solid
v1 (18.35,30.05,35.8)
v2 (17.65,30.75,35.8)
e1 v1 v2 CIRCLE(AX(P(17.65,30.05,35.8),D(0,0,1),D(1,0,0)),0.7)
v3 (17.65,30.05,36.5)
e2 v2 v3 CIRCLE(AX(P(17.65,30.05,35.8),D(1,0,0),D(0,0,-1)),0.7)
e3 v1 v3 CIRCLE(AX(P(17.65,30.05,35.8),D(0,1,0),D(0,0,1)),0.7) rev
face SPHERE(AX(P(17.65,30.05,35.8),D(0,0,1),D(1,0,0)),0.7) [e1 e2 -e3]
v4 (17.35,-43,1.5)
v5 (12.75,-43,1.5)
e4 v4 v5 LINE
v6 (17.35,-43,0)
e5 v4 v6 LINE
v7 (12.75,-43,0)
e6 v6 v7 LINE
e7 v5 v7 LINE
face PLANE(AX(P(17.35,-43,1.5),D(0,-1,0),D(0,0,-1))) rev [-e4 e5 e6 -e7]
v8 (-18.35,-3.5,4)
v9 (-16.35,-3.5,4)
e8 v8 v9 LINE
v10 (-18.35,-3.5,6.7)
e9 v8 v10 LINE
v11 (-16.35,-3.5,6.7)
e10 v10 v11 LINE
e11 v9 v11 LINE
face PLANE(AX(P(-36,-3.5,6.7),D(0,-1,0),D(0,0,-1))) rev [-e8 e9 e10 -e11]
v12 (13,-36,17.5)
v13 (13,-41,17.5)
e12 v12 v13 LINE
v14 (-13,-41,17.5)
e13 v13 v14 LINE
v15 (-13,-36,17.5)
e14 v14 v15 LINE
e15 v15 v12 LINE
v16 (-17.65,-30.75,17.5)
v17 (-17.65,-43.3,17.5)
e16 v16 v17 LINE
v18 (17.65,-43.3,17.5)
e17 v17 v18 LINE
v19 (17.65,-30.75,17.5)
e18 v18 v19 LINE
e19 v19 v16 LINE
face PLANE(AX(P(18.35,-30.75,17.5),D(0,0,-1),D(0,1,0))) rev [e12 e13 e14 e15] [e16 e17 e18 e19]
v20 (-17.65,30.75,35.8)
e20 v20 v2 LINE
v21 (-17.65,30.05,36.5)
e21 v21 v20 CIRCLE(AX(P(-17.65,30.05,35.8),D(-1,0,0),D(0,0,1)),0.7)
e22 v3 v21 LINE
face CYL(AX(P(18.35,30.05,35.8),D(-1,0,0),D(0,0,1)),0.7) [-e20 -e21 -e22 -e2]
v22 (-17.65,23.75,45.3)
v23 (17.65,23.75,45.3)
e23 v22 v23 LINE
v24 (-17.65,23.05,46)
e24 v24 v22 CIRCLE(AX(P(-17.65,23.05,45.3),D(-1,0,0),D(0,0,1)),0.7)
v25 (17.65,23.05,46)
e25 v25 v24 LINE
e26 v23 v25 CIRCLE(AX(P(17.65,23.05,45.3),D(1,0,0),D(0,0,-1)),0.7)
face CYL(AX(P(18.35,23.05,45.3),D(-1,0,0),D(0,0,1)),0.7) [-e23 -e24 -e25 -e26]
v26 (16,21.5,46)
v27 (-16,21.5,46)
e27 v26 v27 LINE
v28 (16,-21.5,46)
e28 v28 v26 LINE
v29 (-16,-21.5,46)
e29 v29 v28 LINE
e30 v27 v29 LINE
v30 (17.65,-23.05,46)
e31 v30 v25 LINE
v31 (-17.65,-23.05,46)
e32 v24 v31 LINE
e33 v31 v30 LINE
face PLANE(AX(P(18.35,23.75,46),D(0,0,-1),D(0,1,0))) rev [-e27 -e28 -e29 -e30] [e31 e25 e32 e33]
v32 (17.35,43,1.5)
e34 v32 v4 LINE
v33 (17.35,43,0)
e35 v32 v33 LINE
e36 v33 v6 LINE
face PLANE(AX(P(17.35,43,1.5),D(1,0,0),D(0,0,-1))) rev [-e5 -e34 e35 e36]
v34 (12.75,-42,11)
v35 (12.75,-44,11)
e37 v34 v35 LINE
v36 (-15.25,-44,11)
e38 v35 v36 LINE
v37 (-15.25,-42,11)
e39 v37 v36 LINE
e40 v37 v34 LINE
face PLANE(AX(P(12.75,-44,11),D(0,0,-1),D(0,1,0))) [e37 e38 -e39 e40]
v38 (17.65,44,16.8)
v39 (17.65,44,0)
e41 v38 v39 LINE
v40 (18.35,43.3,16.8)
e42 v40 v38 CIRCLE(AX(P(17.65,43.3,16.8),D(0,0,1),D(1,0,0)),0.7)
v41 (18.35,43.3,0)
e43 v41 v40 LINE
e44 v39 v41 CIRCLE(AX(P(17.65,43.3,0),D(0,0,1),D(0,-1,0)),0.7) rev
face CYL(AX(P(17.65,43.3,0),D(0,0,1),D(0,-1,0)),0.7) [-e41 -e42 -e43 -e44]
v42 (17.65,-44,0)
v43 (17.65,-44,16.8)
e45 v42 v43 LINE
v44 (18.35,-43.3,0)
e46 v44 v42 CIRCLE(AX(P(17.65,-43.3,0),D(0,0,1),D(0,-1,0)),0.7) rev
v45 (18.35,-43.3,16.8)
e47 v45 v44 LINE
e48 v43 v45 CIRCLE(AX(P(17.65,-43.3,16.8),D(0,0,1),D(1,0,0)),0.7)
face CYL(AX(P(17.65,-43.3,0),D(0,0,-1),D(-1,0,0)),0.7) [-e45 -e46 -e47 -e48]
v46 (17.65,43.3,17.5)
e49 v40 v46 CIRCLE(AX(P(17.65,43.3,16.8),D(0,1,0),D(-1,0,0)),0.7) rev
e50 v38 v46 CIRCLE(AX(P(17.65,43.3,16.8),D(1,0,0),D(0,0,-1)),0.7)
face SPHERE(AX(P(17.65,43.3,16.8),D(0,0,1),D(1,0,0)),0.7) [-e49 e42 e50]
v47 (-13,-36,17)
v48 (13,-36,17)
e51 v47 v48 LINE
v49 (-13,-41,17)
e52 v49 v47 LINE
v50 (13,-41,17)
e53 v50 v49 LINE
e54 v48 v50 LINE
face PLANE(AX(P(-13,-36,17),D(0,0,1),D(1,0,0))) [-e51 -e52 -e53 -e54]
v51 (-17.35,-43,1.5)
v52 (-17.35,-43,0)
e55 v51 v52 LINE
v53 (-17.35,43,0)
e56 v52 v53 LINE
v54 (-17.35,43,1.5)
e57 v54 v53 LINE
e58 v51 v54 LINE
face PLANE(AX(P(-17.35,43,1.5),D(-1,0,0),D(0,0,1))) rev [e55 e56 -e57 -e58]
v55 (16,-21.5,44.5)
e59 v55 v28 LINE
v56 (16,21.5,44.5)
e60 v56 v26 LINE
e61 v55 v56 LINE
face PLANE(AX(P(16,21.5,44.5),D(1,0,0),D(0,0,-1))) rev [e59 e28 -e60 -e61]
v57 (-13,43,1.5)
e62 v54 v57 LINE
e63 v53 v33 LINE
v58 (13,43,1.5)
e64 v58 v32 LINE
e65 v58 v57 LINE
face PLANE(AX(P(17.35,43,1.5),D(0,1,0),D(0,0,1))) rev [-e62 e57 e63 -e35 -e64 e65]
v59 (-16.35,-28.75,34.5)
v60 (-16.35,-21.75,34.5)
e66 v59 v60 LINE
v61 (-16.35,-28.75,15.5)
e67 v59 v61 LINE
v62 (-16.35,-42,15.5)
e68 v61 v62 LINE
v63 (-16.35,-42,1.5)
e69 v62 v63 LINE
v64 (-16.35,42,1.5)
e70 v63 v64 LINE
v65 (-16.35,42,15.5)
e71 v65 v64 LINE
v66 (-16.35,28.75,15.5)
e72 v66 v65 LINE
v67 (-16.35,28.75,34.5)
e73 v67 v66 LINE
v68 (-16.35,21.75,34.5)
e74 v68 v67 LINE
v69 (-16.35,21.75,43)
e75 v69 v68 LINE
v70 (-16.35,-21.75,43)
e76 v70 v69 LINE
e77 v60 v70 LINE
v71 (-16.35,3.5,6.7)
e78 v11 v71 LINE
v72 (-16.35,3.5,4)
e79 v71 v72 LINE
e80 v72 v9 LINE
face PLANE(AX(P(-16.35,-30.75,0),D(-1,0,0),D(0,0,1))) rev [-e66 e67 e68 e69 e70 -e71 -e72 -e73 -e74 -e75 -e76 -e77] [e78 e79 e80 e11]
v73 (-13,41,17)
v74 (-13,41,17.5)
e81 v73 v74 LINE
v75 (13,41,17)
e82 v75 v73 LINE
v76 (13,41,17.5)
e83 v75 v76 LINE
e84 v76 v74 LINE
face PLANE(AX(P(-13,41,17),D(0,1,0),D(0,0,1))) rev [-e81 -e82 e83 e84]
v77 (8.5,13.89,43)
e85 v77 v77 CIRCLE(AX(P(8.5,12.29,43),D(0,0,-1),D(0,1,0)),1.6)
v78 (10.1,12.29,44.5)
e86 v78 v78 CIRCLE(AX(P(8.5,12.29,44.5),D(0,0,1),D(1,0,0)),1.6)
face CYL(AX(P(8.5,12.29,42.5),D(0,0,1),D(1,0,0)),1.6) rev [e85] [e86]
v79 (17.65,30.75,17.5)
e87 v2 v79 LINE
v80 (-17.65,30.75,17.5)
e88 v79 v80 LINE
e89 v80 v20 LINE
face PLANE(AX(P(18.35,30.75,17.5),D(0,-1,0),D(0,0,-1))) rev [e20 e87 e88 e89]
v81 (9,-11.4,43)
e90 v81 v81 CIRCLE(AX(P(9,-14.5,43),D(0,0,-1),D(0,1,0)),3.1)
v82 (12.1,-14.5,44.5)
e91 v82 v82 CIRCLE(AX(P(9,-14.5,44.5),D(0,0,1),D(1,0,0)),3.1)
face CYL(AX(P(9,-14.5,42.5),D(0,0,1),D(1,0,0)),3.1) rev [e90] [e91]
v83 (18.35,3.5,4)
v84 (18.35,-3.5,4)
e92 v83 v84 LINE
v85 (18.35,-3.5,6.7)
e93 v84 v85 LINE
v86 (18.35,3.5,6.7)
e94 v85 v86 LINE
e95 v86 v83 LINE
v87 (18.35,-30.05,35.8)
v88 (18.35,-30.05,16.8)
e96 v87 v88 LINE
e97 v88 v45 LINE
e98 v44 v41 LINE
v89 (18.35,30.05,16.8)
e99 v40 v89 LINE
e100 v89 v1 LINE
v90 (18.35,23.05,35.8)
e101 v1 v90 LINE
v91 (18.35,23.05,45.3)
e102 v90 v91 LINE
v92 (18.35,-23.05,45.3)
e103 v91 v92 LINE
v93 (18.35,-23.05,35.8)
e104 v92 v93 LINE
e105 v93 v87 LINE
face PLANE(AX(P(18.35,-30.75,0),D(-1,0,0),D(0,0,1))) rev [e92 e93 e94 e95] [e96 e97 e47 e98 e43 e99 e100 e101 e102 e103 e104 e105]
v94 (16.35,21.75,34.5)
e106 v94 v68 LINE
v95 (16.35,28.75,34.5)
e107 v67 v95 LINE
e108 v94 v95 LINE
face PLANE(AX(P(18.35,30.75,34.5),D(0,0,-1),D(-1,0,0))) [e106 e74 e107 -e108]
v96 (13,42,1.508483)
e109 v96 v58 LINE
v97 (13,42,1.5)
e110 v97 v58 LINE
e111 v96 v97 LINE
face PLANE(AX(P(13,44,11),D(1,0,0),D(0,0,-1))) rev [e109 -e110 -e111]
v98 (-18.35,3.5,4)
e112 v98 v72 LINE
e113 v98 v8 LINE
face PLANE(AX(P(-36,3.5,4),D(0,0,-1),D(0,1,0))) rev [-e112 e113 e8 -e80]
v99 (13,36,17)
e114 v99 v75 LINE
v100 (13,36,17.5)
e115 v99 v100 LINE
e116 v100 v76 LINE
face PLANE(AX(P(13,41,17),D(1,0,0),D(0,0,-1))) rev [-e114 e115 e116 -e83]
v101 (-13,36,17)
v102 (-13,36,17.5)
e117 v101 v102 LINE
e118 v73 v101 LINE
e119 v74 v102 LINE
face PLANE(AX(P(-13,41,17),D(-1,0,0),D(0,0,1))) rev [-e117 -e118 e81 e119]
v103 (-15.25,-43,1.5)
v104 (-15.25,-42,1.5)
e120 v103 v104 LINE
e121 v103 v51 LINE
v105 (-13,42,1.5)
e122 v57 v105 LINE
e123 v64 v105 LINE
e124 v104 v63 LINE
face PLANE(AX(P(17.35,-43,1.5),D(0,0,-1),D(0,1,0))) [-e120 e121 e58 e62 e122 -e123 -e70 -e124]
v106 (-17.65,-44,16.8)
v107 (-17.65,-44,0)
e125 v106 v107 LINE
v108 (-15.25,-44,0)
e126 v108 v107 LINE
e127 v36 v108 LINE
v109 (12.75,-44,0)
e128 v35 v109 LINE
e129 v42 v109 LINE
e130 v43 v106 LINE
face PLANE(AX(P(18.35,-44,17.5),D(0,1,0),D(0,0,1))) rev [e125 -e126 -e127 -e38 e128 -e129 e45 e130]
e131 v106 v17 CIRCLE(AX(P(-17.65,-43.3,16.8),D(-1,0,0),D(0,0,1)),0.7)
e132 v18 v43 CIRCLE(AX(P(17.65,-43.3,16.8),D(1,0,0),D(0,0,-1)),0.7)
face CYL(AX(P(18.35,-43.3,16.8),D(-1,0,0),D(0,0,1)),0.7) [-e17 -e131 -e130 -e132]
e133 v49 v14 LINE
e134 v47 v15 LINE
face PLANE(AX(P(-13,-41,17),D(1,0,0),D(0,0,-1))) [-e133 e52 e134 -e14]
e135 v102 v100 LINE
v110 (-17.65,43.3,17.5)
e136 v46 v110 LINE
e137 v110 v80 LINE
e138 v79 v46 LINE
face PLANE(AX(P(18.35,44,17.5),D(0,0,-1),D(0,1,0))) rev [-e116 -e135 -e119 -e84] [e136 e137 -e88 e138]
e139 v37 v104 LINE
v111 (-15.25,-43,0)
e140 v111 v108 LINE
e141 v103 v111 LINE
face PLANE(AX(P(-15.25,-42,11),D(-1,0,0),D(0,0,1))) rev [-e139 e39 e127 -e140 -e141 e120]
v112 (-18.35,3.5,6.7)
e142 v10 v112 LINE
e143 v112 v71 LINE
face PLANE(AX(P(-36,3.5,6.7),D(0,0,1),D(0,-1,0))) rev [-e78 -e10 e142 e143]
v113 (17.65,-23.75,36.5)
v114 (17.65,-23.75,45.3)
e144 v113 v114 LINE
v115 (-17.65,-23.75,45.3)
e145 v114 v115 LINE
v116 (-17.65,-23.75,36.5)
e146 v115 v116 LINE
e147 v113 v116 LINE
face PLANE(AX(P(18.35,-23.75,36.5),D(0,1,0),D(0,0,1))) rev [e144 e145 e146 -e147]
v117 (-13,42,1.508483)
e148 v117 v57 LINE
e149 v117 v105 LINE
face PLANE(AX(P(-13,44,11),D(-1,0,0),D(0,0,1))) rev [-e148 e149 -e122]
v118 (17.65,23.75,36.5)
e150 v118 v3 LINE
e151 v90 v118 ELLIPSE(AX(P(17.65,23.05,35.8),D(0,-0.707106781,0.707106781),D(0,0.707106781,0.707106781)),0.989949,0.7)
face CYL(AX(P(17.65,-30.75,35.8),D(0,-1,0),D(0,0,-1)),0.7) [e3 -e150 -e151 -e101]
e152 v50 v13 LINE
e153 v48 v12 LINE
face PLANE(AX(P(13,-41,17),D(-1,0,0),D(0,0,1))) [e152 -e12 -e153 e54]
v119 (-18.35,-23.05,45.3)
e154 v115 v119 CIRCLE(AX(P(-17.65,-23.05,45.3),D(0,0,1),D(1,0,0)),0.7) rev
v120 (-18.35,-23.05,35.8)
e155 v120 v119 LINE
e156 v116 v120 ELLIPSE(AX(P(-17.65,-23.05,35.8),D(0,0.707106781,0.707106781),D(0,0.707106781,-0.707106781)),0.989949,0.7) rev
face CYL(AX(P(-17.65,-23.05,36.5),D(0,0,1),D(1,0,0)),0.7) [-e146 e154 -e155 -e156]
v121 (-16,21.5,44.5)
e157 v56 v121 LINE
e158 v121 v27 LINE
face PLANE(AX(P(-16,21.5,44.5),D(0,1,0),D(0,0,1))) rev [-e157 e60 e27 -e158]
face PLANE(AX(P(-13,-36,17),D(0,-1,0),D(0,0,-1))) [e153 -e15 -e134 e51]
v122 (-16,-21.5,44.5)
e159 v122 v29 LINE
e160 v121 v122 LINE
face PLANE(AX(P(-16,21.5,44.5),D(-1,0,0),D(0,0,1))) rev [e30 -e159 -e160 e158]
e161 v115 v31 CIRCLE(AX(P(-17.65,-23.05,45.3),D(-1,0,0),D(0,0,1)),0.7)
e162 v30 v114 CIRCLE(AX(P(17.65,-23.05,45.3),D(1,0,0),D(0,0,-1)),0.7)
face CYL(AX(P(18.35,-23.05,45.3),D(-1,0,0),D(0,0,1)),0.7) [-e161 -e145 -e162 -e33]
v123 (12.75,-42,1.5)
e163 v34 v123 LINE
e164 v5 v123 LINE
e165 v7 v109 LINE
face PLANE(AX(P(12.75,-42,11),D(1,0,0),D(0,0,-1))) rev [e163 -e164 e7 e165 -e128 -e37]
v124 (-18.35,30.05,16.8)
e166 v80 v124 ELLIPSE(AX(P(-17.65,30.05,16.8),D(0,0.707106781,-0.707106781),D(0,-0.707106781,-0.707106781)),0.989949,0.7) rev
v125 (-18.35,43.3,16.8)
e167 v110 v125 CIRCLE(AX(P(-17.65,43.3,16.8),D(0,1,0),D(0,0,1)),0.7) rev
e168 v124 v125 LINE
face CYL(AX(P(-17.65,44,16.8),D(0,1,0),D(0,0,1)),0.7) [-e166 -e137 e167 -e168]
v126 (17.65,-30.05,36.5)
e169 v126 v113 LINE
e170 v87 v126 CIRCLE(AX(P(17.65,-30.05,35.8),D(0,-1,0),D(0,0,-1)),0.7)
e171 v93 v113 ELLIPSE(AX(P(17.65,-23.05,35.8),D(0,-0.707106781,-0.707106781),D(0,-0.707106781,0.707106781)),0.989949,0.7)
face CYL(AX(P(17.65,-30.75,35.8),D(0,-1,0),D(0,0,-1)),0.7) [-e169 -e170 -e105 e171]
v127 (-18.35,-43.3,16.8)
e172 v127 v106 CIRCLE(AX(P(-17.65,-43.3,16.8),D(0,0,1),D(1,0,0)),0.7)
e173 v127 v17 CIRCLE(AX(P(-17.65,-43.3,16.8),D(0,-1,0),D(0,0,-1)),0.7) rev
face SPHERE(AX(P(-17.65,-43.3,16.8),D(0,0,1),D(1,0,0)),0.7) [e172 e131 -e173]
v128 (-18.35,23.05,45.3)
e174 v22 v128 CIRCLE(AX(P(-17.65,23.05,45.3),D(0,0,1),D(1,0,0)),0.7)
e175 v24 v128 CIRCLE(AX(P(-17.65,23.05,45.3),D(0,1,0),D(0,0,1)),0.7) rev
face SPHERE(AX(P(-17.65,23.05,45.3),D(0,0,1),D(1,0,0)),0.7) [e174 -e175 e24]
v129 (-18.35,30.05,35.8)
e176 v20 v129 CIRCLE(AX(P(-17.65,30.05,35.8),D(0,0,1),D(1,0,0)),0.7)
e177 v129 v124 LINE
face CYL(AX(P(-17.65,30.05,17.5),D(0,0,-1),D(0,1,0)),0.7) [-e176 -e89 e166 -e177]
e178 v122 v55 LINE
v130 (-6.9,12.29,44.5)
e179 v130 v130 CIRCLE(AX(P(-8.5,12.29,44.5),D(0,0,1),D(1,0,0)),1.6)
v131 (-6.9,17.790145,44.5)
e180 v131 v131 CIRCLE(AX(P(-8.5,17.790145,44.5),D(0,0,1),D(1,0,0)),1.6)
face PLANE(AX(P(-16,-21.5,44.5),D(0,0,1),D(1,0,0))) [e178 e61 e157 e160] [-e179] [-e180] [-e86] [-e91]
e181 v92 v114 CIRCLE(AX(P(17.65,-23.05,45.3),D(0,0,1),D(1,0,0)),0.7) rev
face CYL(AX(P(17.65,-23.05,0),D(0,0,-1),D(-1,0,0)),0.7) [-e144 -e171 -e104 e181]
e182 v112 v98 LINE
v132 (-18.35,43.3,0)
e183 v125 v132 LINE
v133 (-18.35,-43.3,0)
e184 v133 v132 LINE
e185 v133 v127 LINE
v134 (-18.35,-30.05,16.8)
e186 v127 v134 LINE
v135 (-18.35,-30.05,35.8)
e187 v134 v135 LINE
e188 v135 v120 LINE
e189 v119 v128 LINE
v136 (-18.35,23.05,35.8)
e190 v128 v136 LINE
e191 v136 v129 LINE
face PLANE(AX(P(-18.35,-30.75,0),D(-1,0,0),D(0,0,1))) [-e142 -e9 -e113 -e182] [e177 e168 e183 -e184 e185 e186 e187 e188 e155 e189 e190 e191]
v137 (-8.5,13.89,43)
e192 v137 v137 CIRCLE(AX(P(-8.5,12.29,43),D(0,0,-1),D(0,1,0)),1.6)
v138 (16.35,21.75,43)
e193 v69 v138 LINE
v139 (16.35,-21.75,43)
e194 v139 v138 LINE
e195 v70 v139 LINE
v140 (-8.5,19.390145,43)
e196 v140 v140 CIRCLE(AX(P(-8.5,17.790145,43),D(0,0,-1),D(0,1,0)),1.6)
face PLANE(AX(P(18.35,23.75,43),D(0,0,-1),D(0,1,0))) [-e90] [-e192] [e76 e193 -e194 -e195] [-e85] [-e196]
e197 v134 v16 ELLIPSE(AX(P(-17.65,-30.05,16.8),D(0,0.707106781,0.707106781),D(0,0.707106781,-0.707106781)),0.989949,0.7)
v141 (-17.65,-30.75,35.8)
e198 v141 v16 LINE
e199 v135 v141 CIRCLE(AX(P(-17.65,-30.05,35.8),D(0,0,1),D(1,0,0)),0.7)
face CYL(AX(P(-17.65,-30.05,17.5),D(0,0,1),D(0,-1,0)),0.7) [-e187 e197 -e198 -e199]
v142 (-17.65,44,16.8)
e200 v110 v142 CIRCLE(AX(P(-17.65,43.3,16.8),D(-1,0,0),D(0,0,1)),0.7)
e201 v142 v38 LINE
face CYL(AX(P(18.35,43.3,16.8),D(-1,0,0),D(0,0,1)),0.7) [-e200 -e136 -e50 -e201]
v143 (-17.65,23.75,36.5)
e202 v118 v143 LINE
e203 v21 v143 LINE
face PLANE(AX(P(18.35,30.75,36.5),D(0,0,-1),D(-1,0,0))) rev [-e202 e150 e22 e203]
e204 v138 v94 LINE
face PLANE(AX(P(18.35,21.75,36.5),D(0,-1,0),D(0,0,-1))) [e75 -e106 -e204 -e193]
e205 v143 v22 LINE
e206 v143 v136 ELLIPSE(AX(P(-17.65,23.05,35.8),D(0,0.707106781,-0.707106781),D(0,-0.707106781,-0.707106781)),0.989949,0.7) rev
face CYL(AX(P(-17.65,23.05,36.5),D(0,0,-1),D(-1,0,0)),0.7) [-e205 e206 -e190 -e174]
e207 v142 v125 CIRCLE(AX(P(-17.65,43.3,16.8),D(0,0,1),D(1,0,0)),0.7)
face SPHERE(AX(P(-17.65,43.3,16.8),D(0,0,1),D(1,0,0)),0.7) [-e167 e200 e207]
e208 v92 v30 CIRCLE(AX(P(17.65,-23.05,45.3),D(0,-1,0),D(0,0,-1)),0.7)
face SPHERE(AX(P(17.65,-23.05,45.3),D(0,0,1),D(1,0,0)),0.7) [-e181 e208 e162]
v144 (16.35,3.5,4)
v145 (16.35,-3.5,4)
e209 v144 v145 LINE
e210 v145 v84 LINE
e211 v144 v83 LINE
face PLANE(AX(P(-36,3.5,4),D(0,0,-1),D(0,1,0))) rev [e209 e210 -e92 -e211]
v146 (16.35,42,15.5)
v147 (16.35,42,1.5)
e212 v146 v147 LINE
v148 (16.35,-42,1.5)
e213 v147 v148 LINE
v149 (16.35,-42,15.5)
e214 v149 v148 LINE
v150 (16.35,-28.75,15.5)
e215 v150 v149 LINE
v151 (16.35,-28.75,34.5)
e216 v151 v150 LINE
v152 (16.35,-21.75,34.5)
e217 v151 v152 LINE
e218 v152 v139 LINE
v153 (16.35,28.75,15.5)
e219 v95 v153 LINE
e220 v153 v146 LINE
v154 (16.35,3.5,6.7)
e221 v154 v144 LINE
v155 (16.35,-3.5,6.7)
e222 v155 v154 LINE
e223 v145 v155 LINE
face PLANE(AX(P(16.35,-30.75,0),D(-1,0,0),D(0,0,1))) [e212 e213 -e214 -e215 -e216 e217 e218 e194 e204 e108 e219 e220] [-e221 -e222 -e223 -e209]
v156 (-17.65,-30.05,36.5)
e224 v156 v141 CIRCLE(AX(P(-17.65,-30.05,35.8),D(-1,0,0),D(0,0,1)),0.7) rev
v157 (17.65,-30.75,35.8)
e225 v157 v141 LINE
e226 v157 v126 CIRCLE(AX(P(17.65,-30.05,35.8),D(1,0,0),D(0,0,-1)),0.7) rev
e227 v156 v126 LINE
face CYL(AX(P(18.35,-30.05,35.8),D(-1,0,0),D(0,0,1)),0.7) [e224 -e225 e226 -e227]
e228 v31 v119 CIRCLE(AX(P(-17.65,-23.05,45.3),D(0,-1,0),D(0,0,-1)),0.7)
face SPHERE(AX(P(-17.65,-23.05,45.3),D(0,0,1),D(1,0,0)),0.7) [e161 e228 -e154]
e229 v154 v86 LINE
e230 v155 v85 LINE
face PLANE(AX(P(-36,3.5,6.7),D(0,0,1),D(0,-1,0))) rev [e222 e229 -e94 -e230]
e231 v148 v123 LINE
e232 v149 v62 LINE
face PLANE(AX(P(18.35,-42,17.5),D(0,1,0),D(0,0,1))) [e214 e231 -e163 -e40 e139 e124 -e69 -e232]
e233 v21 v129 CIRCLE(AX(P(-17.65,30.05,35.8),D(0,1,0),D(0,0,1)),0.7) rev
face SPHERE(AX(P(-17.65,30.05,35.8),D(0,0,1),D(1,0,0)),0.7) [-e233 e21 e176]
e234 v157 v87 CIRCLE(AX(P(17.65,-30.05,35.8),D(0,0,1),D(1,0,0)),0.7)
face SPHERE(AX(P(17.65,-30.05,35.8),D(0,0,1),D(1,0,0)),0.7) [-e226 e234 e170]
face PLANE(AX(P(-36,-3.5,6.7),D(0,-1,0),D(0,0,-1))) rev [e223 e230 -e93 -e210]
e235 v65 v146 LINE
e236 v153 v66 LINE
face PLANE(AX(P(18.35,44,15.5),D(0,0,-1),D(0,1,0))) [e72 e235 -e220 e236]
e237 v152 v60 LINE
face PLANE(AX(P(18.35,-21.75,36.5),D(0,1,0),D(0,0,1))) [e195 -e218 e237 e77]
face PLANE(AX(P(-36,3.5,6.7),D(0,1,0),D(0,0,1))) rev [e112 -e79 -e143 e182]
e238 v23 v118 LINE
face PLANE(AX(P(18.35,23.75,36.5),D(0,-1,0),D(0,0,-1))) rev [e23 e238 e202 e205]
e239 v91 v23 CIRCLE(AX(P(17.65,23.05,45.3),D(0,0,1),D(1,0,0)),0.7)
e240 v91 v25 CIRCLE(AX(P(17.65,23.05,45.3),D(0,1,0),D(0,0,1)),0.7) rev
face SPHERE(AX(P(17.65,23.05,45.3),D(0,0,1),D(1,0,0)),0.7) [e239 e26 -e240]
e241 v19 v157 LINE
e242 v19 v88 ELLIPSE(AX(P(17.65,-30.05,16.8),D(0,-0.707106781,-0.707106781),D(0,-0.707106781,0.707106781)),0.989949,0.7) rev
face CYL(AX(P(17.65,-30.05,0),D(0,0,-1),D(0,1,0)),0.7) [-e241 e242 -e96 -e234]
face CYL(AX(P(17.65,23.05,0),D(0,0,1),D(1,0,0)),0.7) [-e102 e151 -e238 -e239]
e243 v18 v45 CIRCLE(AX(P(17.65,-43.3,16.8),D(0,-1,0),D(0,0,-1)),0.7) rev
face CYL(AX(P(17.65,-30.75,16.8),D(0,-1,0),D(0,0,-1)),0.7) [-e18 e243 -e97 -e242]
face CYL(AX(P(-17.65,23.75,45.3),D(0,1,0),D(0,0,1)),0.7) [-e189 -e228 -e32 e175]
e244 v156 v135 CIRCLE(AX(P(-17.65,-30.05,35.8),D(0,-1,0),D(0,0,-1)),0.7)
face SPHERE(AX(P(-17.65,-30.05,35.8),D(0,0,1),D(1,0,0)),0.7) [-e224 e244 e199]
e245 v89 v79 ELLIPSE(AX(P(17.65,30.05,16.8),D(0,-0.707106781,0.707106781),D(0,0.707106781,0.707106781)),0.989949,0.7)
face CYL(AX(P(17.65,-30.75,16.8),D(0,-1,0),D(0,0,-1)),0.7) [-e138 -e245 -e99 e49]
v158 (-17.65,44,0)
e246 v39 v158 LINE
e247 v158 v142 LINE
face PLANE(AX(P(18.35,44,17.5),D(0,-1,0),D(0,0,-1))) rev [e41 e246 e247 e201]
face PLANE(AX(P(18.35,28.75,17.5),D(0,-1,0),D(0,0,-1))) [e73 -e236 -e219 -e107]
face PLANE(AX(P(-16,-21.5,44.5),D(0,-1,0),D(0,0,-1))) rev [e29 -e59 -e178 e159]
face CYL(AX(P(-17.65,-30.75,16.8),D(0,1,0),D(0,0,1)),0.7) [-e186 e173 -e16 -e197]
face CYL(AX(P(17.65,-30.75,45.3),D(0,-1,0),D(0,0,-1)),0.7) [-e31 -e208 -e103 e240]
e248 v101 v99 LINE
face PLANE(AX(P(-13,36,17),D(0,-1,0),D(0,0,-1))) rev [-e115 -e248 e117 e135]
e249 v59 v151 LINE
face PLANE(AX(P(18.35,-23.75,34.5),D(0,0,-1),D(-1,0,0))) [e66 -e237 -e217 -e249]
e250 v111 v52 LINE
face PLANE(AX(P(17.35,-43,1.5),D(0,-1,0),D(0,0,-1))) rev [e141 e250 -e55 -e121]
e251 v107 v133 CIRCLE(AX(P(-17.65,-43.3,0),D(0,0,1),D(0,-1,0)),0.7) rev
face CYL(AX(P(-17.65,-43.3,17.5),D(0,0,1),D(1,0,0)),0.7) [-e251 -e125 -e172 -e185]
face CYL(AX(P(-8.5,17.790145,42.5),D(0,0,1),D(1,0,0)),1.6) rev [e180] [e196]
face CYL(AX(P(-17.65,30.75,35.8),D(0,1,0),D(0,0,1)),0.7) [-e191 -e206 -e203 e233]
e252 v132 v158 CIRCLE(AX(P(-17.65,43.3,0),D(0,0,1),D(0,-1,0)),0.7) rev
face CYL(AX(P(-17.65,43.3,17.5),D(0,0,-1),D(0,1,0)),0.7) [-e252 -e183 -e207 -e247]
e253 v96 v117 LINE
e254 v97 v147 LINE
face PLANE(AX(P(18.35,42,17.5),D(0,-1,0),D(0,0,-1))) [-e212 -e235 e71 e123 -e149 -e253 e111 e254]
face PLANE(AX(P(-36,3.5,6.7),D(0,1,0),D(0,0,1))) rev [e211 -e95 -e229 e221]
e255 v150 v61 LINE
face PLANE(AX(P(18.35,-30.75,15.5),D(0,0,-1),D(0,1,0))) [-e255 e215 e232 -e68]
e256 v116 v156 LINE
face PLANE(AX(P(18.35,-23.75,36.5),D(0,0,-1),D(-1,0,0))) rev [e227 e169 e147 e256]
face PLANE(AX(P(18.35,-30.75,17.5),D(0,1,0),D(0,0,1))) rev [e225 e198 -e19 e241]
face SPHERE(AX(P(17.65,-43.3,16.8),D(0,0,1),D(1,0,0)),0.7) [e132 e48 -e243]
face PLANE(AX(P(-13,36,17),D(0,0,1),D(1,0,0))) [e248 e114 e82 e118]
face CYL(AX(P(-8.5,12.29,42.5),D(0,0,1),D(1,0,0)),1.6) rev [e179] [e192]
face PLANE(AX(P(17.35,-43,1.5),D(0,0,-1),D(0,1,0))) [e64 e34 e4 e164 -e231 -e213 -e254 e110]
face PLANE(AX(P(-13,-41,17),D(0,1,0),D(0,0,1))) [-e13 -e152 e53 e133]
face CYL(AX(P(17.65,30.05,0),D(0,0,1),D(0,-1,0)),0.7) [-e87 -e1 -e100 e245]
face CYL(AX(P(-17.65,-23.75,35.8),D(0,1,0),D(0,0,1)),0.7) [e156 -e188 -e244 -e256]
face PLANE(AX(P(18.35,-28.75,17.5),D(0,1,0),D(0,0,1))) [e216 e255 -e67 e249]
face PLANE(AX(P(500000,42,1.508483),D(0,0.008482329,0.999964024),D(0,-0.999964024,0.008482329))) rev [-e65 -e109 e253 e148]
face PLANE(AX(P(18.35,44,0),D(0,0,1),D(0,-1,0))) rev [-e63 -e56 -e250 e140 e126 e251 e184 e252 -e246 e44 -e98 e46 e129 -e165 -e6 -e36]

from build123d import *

# Parameters (mm, degrees)
EXTRUDE_1_DEPTH      = 18.35
FILLET_1_R           = 0.7
SHELL_START          = -28.75
SHELL_1_OUTLINE_W    = 32.7
SHELL_1_OUTLINE_H    = 34.5
SHELL_1_DEPTH        = 57.5
SHELL_START_2        = -42
SHELL_1_2_OUTLINE_W  = 32.7
SHELL_1_2_OUTLINE_H  = 15.5
SHELL_1_2_DEPTH      = 84
SHELL_START_3        = -21.75
SHELL_1_3_OUTLINE_W  = 32.7
SHELL_1_3_OUTLINE_H  = 8.5
SHELL_1_3_DEPTH      = 43.5
SKETCH_2_W           = 32
SKETCH_2_H           = 43
CUT_EXTRUDE_1_DEPTH  = 1.5
SKETCH_7_W           = 25.5
SKETCH_7_H           = 2
SKETCH_7_W_2         = 26
CUT_EXTRUDE_5_DEPTH  = 11
SKETCH_8_W           = 2.7
SKETCH_8_H           = 7
CUT_EXTRUDE_6_DEPTH  = 36
SKETCH_9_W           = 26
SKETCH_9_H           = 5
CUT_EXTRUDE_7_DEPTH  = 0.5
SKETCH_10_W          = 34.7
SKETCH_10_H          = 86
SKETCH_10_W_2        = 32.7
SKETCH_10_H_2        = 84
CUT_EXTRUDE_8_DEPTH  = 1.5
SKETCH_11_W          = 2.5
SKETCH_11_H          = 11
CUT_EXTRUDE_9_DEPTH  = 2
SKETCH_12_R          = 1.6
SKETCH_12_R_2        = 3.1
CUT_EXTRUDE_10_DEPTH = 2
EXTRUDE_2_REACH      = 72.956


# Read off the part's stored shape, not the designer's step: Оболочка1
with BuildPart() as part:
    # Эскиз1 → Вытянуть1 (new, symmetric)
    with BuildSketch(Plane(origin=(0, 0, 0), x_dir=(0, 0, -1), z_dir=(1, 0, 0))):
        Polygon((-17.5, -30.75), (-17.5, -44), (0, -44), (0, 44), (-17.5, 44), (-17.5, 30.75), (-36.5, 30.75), (-36.5, 23.75), (-46, 23.75), (-46, -23.75), (-36.5, -23.75), (-36.5, -30.75), align=None)
    extrude(amount=EXTRUDE_1_DEPTH, both=True)

    # Скругление1
    fillet_1_edges = [part.edges().sort_by_distance(p)[0] for p in [
        (18.35, 37.375, 17.5),
        (-18.35, -37.375, 17.5),
        (-18.35, -30.75, 27),
        (-18.35, -27.25, 36.5),
        (-18.35, -23.75, 41.25),
        (-18.35, 0, 46),
        (-18.35, 23.75, 41.25),
        (-18.35, 27.25, 36.5),
        (-18.35, 30.75, 27),
        (18.35, 30.75, 27),
        (-18.35, 37.375, 17.5),
        (-18.35, 44, 8.75),
        (18.35, 27.25, 36.5),
        (0, -44, 17.5),
        (0, -30.75, 36.5),
        (0, -23.75, 46),
        (0, 23.75, 46),
        (18.35, 23.75, 41.25),
        (0, 30.75, 36.5),
        (0, 44, 17.5),
        (18.35, 0, 46),
        (18.35, -23.75, 41.25),
        (18.35, -27.25, 36.5),
        (18.35, -30.75, 27),
        (18.35, -37.375, 17.5),
        (18.35, -44, 8.75),
        (18.35, 44, 8.75),
        (-18.35, -44, 8.75),
    ]]
    fillet(fillet_1_edges, radius=FILLET_1_R)

    # Оболочка1 outline → Оболочка1 (cut)
    with BuildSketch(Plane(origin=(0, 0, 0), x_dir=(1, 0, 0), z_dir=(0, 1, 0)).offset(SHELL_START)):
        with Locations((0, -17.25)):
            Rectangle(SHELL_1_OUTLINE_W, SHELL_1_OUTLINE_H)
    extrude(amount=SHELL_1_DEPTH, mode=Mode.SUBTRACT)

    # Shell 1 2 outline → Shell 1 2 (cut)
    with BuildSketch(Plane(origin=(0, 0, 0), x_dir=(1, 0, 0), z_dir=(0, 1, 0)).offset(SHELL_START_2)):
        with Locations((0, -7.75)):
            Rectangle(SHELL_1_2_OUTLINE_W, SHELL_1_2_OUTLINE_H)
    extrude(amount=SHELL_1_2_DEPTH, mode=Mode.SUBTRACT)

    # Shell 1 3 outline → Shell 1 3 (cut)
    with BuildSketch(Plane(origin=(0, 0, 0), x_dir=(1, 0, 0), z_dir=(0, 1, 0)).offset(SHELL_START_3)):
        with Locations((0, -38.75)):
            Rectangle(SHELL_1_3_OUTLINE_W, SHELL_1_3_OUTLINE_H)
    extrude(amount=SHELL_1_3_DEPTH, mode=Mode.SUBTRACT)

    # Эскиз2 → Вырез-Вытянуть1 (cut)
    with BuildSketch(Plane.XY.offset(46)):
        Rectangle(SKETCH_2_W, SKETCH_2_H)
    extrude(amount=-CUT_EXTRUDE_1_DEPTH, mode=Mode.SUBTRACT)

    # Эскиз7 → Вырез-Вытянуть5 (cut)
    with BuildSketch(Plane(origin=(0, 0, 0), x_dir=(-1, 0, 0), z_dir=(0, 0, -1))):
        with Locations((0, -43)):
            Rectangle(SKETCH_7_W, SKETCH_7_H)
        with Locations((0, 43)):
            Rectangle(SKETCH_7_W_2, SKETCH_7_H)
    extrude(amount=-CUT_EXTRUDE_5_DEPTH, mode=Mode.SUBTRACT)

    # Эскиз8 → Вырез-Вытянуть6 (cut, symmetric)
    with BuildSketch(Plane(origin=(0, 0, 0), x_dir=(0, 0, -1), z_dir=(1, 0, 0))):
        with Locations((-5.35, 0)):
            Rectangle(SKETCH_8_W, SKETCH_8_H)
    extrude(amount=CUT_EXTRUDE_6_DEPTH, both=True, mode=Mode.SUBTRACT)

    # Эскиз9 → Вырез-Вытянуть7 (cut)
    with BuildSketch(Plane.XY.offset(17.5)):
        with Locations((0, 38.5)):
            Rectangle(SKETCH_9_W, SKETCH_9_H)
    cut_extrude_7 = extrude(amount=-CUT_EXTRUDE_7_DEPTH, mode=Mode.SUBTRACT)

    # Зеркальное отражение1: Вырез-Вытянуть7 across plane
    add(cut_extrude_7.mirror(Plane.ZX), mode=Mode.SUBTRACT)

    # Эскиз10 → Вырез-Вытянуть8 (cut)
    with BuildSketch(Plane(origin=(0, 0, 0), x_dir=(-1, 0, 0), z_dir=(0, 0, -1))):
        Rectangle(SKETCH_10_W, SKETCH_10_H)
        Rectangle(SKETCH_10_W_2, SKETCH_10_H_2, mode=Mode.SUBTRACT)
    extrude(amount=-CUT_EXTRUDE_8_DEPTH, mode=Mode.SUBTRACT)

    # Эскиз11 → Вырез-Вытянуть9 (cut)
    with BuildSketch(Plane.XZ.offset(44)):
        with Locations((-14, 5.5)):
            Rectangle(SKETCH_11_W, SKETCH_11_H)
    extrude(amount=-CUT_EXTRUDE_9_DEPTH, mode=Mode.SUBTRACT)

    # Эскиз12 → Вырез-Вытянуть10 (cut)
    with BuildSketch(Plane.XY.offset(44.5)):
        with Locations((-8.5, 17.790145453)):
            Circle(SKETCH_12_R)
        with Locations((-8.5, 12.29)):
            Circle(SKETCH_12_R)
        with Locations((8.5, 12.29)):
            Circle(SKETCH_12_R)
        with Locations((9, -14.5)):
            Circle(SKETCH_12_R_2)
    extrude(amount=-CUT_EXTRUDE_10_DEPTH, mode=Mode.SUBTRACT)

    # Эскиз13 → Вытянуть2 (add, up to next)
    with BuildSketch(Plane(origin=(-13, 0, 0), x_dir=(0, 0, -1), z_dir=(1, 0, 0)), mode=Mode.PRIVATE) as extrude_2_sk1:
        Polygon((-11, 44), (-11, 42), (-1.508482634, 42), (-1.5, 43), (0, 43), (0, 44), align=None)
    extrude_2_tool1 = extrude(extrude_2_sk1.sketch, amount=EXTRUDE_2_REACH, mode=Mode.PRIVATE) - part.part
    add(extrude_2_tool1.solids().sort_by_distance((-13, 43.036731, 5.84846))[0])


solid = part.part
